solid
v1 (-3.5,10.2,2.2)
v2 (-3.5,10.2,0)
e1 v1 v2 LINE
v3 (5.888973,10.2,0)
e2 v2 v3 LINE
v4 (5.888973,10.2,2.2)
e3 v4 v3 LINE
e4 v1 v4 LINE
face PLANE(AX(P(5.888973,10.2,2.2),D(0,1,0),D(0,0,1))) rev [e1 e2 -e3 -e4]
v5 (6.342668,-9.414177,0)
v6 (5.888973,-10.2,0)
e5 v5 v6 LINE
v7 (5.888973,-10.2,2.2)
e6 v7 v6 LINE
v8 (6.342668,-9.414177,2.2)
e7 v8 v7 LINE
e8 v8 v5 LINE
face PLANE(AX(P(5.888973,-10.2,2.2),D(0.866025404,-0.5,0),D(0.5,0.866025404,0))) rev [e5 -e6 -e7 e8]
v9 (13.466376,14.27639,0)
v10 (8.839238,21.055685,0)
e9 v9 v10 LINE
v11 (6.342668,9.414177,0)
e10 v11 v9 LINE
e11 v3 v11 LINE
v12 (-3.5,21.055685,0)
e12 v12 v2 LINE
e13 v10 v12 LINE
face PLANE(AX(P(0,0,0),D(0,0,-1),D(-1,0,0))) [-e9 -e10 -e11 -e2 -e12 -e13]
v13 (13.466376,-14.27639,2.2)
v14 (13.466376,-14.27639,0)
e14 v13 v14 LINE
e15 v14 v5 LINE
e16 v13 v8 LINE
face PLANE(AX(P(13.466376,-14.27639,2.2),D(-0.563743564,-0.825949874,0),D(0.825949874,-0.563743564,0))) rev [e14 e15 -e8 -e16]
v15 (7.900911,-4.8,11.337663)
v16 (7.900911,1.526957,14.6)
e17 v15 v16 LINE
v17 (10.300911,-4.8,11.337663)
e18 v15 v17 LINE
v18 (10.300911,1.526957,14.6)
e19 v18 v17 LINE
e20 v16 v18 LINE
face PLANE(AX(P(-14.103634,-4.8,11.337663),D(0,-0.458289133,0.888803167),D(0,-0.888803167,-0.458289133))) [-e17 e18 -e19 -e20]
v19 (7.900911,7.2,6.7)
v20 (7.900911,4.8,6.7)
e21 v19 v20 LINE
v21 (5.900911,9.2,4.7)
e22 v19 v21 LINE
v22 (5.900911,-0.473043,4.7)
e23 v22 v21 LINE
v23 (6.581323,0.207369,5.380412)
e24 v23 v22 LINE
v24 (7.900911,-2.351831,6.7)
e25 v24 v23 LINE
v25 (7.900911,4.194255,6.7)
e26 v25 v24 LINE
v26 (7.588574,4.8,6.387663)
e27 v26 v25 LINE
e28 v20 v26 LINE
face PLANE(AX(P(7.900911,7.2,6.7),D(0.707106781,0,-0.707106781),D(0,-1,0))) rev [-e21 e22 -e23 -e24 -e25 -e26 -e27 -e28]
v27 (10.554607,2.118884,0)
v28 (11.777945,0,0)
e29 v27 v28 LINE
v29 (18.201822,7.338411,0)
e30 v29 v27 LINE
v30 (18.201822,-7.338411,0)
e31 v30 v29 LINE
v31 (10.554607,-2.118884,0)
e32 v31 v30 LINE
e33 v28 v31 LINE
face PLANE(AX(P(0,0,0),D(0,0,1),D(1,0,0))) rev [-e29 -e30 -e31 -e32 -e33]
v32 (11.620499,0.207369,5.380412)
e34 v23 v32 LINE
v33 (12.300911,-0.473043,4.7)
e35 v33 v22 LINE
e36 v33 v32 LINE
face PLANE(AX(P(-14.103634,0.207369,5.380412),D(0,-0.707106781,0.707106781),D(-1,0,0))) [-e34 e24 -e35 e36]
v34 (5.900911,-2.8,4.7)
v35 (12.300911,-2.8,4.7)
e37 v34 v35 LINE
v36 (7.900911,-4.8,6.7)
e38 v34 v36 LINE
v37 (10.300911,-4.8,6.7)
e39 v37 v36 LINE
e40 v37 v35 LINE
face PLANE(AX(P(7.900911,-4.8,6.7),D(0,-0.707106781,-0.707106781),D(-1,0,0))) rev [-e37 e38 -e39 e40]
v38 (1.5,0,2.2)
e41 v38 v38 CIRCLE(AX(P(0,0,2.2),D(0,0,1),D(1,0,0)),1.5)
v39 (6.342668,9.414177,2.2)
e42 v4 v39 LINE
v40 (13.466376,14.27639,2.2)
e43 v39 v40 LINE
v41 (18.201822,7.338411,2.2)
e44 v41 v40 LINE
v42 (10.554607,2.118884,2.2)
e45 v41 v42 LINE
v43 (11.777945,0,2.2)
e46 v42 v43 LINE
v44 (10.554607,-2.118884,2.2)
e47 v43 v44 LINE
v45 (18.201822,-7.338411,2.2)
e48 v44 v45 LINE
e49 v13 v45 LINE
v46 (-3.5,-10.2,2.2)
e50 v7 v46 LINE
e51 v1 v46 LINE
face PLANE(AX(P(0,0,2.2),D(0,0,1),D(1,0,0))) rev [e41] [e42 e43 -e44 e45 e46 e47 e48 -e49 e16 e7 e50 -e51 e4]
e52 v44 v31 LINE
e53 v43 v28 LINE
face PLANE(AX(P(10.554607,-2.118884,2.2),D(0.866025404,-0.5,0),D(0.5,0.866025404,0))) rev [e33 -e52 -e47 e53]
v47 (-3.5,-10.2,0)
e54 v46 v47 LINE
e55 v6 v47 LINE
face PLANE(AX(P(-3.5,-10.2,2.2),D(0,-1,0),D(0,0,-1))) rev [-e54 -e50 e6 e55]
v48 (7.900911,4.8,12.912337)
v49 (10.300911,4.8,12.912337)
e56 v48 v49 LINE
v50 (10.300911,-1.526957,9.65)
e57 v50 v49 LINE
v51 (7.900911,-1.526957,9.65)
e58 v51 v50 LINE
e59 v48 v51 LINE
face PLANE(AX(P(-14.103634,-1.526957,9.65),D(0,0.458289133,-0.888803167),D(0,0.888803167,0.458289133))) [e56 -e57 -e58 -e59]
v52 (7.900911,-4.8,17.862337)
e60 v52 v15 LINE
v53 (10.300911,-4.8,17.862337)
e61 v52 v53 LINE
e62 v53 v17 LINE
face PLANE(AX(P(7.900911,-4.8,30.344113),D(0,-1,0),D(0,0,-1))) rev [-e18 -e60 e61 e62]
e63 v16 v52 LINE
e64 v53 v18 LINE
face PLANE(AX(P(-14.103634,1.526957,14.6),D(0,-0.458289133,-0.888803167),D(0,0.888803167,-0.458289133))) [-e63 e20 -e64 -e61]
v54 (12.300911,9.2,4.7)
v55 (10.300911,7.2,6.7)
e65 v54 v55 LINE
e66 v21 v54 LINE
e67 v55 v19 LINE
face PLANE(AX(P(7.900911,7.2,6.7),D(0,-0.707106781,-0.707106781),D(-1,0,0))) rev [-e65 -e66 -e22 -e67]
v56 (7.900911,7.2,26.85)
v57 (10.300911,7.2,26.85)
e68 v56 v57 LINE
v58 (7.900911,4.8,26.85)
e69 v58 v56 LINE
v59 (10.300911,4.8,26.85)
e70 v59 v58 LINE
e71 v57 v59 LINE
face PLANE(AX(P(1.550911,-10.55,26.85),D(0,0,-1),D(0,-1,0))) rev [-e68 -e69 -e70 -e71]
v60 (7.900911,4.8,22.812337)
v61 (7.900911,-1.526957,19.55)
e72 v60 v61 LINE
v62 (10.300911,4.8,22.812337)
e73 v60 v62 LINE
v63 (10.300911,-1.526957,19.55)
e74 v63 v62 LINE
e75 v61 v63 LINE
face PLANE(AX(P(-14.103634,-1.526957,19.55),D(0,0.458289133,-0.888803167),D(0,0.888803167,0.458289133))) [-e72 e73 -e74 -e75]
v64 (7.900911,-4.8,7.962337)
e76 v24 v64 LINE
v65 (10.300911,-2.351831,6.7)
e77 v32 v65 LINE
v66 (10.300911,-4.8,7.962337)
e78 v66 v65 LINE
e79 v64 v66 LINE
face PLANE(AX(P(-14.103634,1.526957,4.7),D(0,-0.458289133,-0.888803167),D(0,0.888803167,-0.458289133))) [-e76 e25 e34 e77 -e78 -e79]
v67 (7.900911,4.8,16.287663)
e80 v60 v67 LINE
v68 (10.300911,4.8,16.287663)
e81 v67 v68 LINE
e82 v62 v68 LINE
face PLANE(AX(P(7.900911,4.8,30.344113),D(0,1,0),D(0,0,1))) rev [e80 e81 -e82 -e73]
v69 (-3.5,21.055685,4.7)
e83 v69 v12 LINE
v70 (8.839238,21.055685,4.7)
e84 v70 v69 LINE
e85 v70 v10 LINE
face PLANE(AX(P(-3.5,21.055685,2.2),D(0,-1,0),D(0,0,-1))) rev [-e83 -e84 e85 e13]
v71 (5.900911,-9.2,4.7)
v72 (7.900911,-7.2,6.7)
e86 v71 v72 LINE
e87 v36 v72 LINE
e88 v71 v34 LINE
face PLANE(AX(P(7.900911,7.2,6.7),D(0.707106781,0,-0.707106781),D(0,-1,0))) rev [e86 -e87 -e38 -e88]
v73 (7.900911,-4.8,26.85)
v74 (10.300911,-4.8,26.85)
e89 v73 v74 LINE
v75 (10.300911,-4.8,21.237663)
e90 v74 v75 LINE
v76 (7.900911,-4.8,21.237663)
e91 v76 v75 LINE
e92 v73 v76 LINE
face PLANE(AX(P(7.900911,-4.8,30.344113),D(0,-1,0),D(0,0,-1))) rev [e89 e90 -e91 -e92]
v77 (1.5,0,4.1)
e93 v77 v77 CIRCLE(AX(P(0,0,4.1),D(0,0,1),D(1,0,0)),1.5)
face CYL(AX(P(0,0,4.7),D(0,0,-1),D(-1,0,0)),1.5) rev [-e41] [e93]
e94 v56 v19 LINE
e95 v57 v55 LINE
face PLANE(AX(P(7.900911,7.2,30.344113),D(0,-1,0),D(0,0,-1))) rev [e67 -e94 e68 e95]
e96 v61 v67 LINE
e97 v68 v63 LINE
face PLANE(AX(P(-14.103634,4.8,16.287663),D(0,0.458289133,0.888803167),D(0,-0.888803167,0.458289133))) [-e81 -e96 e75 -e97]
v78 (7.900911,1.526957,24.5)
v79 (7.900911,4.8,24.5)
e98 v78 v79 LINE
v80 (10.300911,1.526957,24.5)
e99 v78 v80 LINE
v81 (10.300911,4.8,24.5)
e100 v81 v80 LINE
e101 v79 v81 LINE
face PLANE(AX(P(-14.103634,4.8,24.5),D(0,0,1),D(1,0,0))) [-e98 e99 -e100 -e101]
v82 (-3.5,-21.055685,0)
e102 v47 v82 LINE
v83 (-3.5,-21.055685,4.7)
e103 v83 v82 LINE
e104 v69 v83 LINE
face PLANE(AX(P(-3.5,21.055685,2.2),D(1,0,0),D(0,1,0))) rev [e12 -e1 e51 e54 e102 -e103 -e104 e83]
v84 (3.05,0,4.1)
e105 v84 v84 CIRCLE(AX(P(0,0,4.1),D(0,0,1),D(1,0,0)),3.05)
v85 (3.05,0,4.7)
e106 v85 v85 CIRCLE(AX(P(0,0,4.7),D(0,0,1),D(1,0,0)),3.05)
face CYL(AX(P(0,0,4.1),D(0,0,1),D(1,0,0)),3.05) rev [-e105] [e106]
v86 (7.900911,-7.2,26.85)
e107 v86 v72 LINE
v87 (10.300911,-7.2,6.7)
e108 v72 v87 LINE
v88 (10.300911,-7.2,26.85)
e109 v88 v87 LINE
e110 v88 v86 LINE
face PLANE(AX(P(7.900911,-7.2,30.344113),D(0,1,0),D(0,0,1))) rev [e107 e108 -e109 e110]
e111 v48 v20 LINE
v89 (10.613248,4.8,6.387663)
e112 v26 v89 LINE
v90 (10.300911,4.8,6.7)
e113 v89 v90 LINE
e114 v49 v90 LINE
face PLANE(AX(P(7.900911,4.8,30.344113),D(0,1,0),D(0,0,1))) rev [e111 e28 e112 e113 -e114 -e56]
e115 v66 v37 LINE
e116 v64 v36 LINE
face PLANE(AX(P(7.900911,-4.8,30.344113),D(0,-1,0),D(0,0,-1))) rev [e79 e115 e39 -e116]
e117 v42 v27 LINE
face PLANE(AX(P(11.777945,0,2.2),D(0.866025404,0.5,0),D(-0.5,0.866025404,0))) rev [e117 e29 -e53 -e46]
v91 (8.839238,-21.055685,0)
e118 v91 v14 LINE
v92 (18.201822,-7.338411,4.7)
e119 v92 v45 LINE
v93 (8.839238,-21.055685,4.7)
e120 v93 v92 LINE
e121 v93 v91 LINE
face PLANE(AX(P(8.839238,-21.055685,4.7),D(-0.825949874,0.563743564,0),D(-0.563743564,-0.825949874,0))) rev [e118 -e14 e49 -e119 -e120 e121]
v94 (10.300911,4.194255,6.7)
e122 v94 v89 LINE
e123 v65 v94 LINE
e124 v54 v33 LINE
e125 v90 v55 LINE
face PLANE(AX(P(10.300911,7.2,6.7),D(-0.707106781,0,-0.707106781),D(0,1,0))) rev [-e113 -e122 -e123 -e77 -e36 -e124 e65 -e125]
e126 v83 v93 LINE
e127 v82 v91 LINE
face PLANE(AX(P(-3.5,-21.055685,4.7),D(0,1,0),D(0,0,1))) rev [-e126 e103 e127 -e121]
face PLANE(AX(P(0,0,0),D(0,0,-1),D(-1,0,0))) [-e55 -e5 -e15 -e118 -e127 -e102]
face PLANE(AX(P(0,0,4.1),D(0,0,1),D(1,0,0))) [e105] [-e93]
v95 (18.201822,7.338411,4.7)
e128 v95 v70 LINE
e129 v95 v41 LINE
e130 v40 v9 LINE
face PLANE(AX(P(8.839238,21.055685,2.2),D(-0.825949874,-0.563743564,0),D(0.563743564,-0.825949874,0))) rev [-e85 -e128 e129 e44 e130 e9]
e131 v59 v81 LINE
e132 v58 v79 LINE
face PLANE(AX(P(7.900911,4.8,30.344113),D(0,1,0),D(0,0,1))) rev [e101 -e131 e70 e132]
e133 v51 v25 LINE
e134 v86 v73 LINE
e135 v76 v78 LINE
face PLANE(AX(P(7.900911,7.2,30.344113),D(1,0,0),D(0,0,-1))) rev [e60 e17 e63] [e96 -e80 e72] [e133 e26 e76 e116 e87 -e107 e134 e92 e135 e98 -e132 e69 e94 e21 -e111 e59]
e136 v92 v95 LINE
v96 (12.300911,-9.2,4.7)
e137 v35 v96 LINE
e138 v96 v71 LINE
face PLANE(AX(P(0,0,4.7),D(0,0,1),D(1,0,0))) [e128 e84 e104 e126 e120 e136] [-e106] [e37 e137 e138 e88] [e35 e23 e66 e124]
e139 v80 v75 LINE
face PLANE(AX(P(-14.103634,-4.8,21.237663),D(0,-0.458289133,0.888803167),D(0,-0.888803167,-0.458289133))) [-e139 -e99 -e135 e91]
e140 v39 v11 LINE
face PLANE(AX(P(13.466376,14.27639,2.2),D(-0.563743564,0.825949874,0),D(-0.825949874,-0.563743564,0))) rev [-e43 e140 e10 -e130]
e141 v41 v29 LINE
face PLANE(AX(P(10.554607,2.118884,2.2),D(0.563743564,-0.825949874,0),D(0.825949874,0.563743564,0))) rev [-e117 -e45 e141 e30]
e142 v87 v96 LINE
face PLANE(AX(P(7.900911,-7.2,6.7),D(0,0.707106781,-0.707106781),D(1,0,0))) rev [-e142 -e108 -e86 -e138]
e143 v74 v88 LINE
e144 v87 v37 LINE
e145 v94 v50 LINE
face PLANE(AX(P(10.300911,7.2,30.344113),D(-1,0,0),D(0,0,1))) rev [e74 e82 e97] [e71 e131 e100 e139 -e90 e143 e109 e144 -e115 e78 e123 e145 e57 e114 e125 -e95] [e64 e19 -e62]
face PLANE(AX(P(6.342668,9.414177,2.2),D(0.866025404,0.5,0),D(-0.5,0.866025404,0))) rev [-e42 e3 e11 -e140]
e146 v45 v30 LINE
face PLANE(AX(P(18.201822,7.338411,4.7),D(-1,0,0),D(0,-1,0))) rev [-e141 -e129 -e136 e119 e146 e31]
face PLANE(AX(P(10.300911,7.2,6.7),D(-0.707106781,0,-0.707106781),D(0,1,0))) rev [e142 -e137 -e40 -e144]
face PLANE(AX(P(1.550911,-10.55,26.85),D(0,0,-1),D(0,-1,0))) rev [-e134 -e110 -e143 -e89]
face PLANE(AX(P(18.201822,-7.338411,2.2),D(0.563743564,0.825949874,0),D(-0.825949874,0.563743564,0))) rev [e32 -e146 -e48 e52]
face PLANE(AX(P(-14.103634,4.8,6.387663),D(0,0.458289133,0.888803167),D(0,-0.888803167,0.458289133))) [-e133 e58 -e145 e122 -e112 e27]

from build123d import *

# Parameters (mm, degrees)
BOSS_EXTRUDE1_DEPTH   = 2.2
BOSS_EXTRUDE1_2_DEPTH = 2.2
BOSS_EXTRUDE1_3_DEPTH = 2.2
SKETCH3_R             = 1.5
BOSS_EXTRUDE2_DEPTH   = 2.5
SKETCH4_R             = 3.05
CUT_EXTRUDE1_DEPTH    = 0.6
SKETCH5_W             = 2.4
SKETCH5_H             = 2.4
BOSS_EXTRUDE3_DEPTH   = 22.15
BOSS_EXTRUDE4_DEPTH   = 2.4
CHAMFER1_SIZE         = 2
CHAMFER1_SIZE_2       = 1.48467926


with BuildPart() as part:
    # Sketch1 → Boss-Extrude1 (new body)
    with BuildSketch(Plane.XY):
        Polygon((-3.5, 21.055685406), (-3.5, 10.2), (5.888972746, 10.2), (6.342667922, 9.414176903), (13.466375906, 14.276390289), (8.839237969, 21.055685406), align=None)
    extrude(amount=BOSS_EXTRUDE1_DEPTH)



with BuildPart() as body_2:
    # Sketch1 → Boss-Extrude1 2 (new body)
    with BuildSketch(Plane.XY):
        Polygon((18.201821848, -7.338411352), (10.554607275, -2.118883945), (11.777945491, 0), (10.554607275, 2.118883945), (18.201821848, 7.338411352), align=None)
    extrude(amount=BOSS_EXTRUDE1_2_DEPTH)


with BuildPart() as body_3:
    # Sketch1 → Boss-Extrude1 3 (new body)
    with BuildSketch(Plane.XY):
        Polygon((8.839237969, -21.055685406), (13.466375906, -14.276390289), (6.342667922, -9.414176903), (5.888972746, -10.2), (-3.5, -10.2), (-3.5, -21.055685406), align=None)
    extrude(amount=BOSS_EXTRUDE1_3_DEPTH)


with BuildPart() as part_1:
    add(part.part)

    add(body_2.part)  # Boss-Extrude2 merges body 2

    add(body_3.part)  # Boss-Extrude2 merges body 3
    # Sketch3 → Boss-Extrude2 (add)
    with BuildSketch(Plane.XY.offset(2.2)):
        Polygon((-3.5, 21.055685406), (-3.5, -21.055685406), (8.839237969, -21.055685406), (18.201821848, -7.338411352), (18.201821848, 7.338411352), (8.839237969, 21.055685406), align=None)
        Circle(SKETCH3_R, mode=Mode.SUBTRACT)
    extrude(amount=BOSS_EXTRUDE2_DEPTH)

    # Sketch4 → Cut-Extrude1 (cut)
    with BuildSketch(Plane.XY.offset(4.7)):
        Circle(SKETCH4_R)
    extrude(amount=-CUT_EXTRUDE1_DEPTH, mode=Mode.SUBTRACT)

    # Sketch5 → Boss-Extrude3 (add)
    with BuildSketch(Plane.XY.offset(4.7)):
        with Locations((9.100910924, 6)):
            Rectangle(SKETCH5_W, SKETCH5_H)
        with Locations((9.100910924, -6)):
            Rectangle(SKETCH5_W, SKETCH5_H)
    extrude(amount=BOSS_EXTRUDE3_DEPTH)

    # Sketch6 → Boss-Extrude4 (add)
    with BuildSketch(Plane(origin=(10.300910924, 0, 0), x_dir=(0, 0, -1), z_dir=(1, 0, 0))):
        Polygon((-6.387662753, 4.8), (-9.65, -1.526957086), (-12.912337247, 4.8), (-16.287662753, 4.8), (-19.55, -1.526957086), (-22.812337247, 4.8), (-24.5, 4.8), (-24.5, 1.526957086), (-21.237662753, -4.8), (-17.862337247, -4.8), (-14.6, 1.526957086), (-11.337662753, -4.8), (-7.962337247, -4.8), (-4.7, 1.526957086), (-4.7, 4.8), align=None)
    extrude(amount=-BOSS_EXTRUDE4_DEPTH)

    # Chamfer1
    # the kernel refuses this chamfer: 2, 1.48467926 mm, written as the material it adds along each edge
    with BuildSketch(Plane(origin=(15.4442769, 1.526957086, 4.7), x_dir=(0, -1, 0), z_dir=(-1, 0, 0))) as chamfer1_piece_1_section:
        Polygon((CHAMFER1_SIZE, 0), (CHAMFER1_SIZE_2 * 0.888803167403, CHAMFER1_SIZE_2 * 0.458289133192), (0, 0), align=None)
    chamfer1_piece_1 = extrude(amount=12.686731952, mode=Mode.PRIVATE)
    chamfer1_piece_1 = split(chamfer1_piece_1, bisect_by=Plane(origin=(10.672593912, 1.526957086, 9.471682988), z_dir=(0.7071067811865476, 0, -0.7071067811865476)), keep=Keep.TOP, mode=Mode.PRIVATE)
    chamfer1_piece_1 = split(chamfer1_piece_1, bisect_by=Plane(origin=(13.872593912, 1.526957086, 3.128317012), z_dir=(-0.7071067811865476, 0, -0.7071067811865476)), keep=Keep.TOP, mode=Mode.PRIVATE)
    add(chamfer1_piece_1)
    with BuildSketch(Plane(origin=(2.757544948, 7.2, 4.7), x_dir=(0, 1, 0), z_dir=(1, 0, 0))) as chamfer1_piece_2_section:
        Polygon((CHAMFER1_SIZE, 0), (0, CHAMFER1_SIZE), (0, 0), align=None)
    chamfer1_piece_2 = extrude(amount=12.686731952, mode=Mode.PRIVATE)
    chamfer1_piece_2 = split(chamfer1_piece_2, bisect_by=Plane(origin=(4.329227936, 7.2, 3.128317012), z_dir=(0.7071067811865476, 0, -0.7071067811865476)), keep=Keep.TOP, mode=Mode.PRIVATE)
    chamfer1_piece_2 = split(chamfer1_piece_2, bisect_by=Plane(origin=(7.529227936, 7.2, 9.471682988), z_dir=(-0.7071067811865476, 0, -0.7071067811865476)), keep=Keep.TOP, mode=Mode.PRIVATE)
    add(chamfer1_piece_2)
    with BuildSketch(Plane(origin=(10.300910924, 12.343365976, 4.7), x_dir=(1, 0, 0), z_dir=(0, -1, 0))) as chamfer1_piece_3_section:
        Polygon((CHAMFER1_SIZE, 0), (0, CHAMFER1_SIZE), (0, 0), align=None)
    chamfer1_piece_3 = extrude(amount=15.959774866, mode=Mode.PRIVATE)
    chamfer1_piece_3 = split(chamfer1_piece_3, bisect_by=Plane(origin=(10.300910924, 4.8, 4.7), z_dir=(0, 1, 0)), keep=Keep.TOP, mode=Mode.PRIVATE)
    chamfer1_piece_3 = split(chamfer1_piece_3, bisect_by=Plane(origin=(10.300910924, 10.771682988, 3.128317012), z_dir=(0, -0.7071067811865476, -0.7071067811865476)), keep=Keep.TOP, mode=Mode.PRIVATE)
    add(chamfer1_piece_3)
    with BuildSketch(Plane(origin=(10.300910924, 12.343365976, 4.7), x_dir=(1, 0, 0), z_dir=(0, -1, 0))) as chamfer1_piece_4_section:
        Polygon((CHAMFER1_SIZE, 0), (0, CHAMFER1_SIZE), (0, 0), align=None)
    chamfer1_piece_4 = extrude(amount=15.959774866, mode=Mode.PRIVATE)
    chamfer1_piece_4 = split(chamfer1_piece_4, bisect_by=Plane(origin=(10.300910924, 11.446474594, 2.96057429), z_dir=(0, -0.4582891331950048, -0.8888031674084939)), keep=Keep.TOP, mode=Mode.PRIVATE)
    chamfer1_piece_4 = split(chamfer1_piece_4, bisect_by=Plane(origin=(10.300910924, 5.935161531, 11.108204445), z_dir=(0, 0.7071067811865488, -0.7071067811865462)), keep=Keep.TOP, mode=Mode.PRIVATE)
    add(chamfer1_piece_4)
    with BuildSketch(Plane(origin=(10.300910924, 12.343365976, 4.7), x_dir=(1, 0, 0), z_dir=(0, -1, 0))) as chamfer1_piece_5_section:
        Polygon((CHAMFER1_SIZE, 0), (0, CHAMFER1_SIZE), (0, 0), align=None)
    chamfer1_piece_5 = extrude(amount=15.959774866, mode=Mode.PRIVATE)
    chamfer1_piece_5 = split(chamfer1_piece_5, bisect_by=Plane(origin=(10.300910924, 10.071607195, 0.294164788), z_dir=(0, 0.4582891331950048, 0.8888031674084939)), keep=Keep.TOP, mode=Mode.PRIVATE)
    chamfer1_piece_5 = split(chamfer1_piece_5, bisect_by=Plane(origin=(10.300910924, 5.935161531, 11.108204445), z_dir=(0, -0.7071067811865488, 0.7071067811865462)), keep=Keep.TOP, mode=Mode.PRIVATE)
    add(chamfer1_piece_5)
    with BuildSketch(Plane(origin=(7.900910924, -3.61640889, 4.7), x_dir=(-1, 0, 0), z_dir=(0, 1, 0))) as chamfer1_piece_6_section:
        Polygon((CHAMFER1_SIZE, 0), (0, CHAMFER1_SIZE), (0, 0), align=None)
    chamfer1_piece_6 = extrude(amount=15.959774866, mode=Mode.PRIVATE)
    chamfer1_piece_6 = split(chamfer1_piece_6, bisect_by=Plane(origin=(7.900910924, -2.53615324, 6.795041262), z_dir=(0, 0.4582891331950048, 0.8888031674084939)), keep=Keep.TOP, mode=Mode.PRIVATE)
    chamfer1_piece_6 = split(chamfer1_piece_6, bisect_by=Plane(origin=(7.900910924, -1.16128584, 9.461450764), z_dir=(0, -0.4582891331950048, -0.8888031674084939)), keep=Keep.TOP, mode=Mode.PRIVATE)
    add(chamfer1_piece_6)
    with BuildSketch(Plane(origin=(7.900910924, -3.61640889, 4.7), x_dir=(-1, 0, 0), z_dir=(0, 1, 0))) as chamfer1_piece_7_section:
        Polygon((CHAMFER1_SIZE, 0), (0, CHAMFER1_SIZE), (0, 0), align=None)
    chamfer1_piece_7 = extrude(amount=15.959774866, mode=Mode.PRIVATE)
    chamfer1_piece_7 = split(chamfer1_piece_7, bisect_by=Plane(origin=(7.900910924, -1.16128584, 9.461450764), z_dir=(0, -0.4582891331950048, -0.8888031674084939)), keep=Keep.TOP, mode=Mode.PRIVATE)
    chamfer1_piece_7 = split(chamfer1_piece_7, bisect_by=Plane(origin=(7.900910924, -2.044725902, 3.128317012), z_dir=(0, 0.7071067811865488, -0.7071067811865462)), keep=Keep.TOP, mode=Mode.PRIVATE)
    add(chamfer1_piece_7)
    with BuildSketch(Plane(origin=(7.900910924, -3.61640889, 4.7), x_dir=(-1, 0, 0), z_dir=(0, 1, 0))) as chamfer1_piece_8_section:
        Polygon((CHAMFER1_SIZE, 0), (0, CHAMFER1_SIZE), (0, 0), align=None)
    chamfer1_piece_8 = extrude(amount=15.959774866, mode=Mode.PRIVATE)
    chamfer1_piece_8 = split(chamfer1_piece_8, bisect_by=Plane(origin=(7.900910924, 4.8, 4.7), z_dir=(0, 1, 0)), keep=Keep.TOP, mode=Mode.PRIVATE)
    chamfer1_piece_8 = split(chamfer1_piece_8, bisect_by=Plane(origin=(7.900910924, 2.791795555, 11.108204445), z_dir=(0, -0.7071067811865476, -0.7071067811865476)), keep=Keep.TOP, mode=Mode.PRIVATE)
    add(chamfer1_piece_8)
    with BuildSketch(Plane(origin=(2.757544948, -4.8, 4.7), x_dir=(0, 1, 0), z_dir=(1, 0, 0))) as chamfer1_piece_9_section:
        Polygon((CHAMFER1_SIZE, 0), (0, CHAMFER1_SIZE), (0, 0), align=None)
    chamfer1_piece_9 = extrude(amount=12.686731952, mode=Mode.PRIVATE)
    chamfer1_piece_9 = split(chamfer1_piece_9, bisect_by=Plane(origin=(4.329227936, -4.8, 3.128317012), z_dir=(0.7071067811865476, 0, -0.7071067811865476)), keep=Keep.TOP, mode=Mode.PRIVATE)
    chamfer1_piece_9 = split(chamfer1_piece_9, bisect_by=Plane(origin=(7.529227936, -4.8, 9.471682988), z_dir=(-0.7071067811865476, 0, -0.7071067811865476)), keep=Keep.TOP, mode=Mode.PRIVATE)
    add(chamfer1_piece_9)
    with BuildSketch(Plane(origin=(10.300910924, 0.343365976, 4.7), x_dir=(1, 0, 0), z_dir=(0, -1, 0))) as chamfer1_piece_10_section:
        Polygon((CHAMFER1_SIZE, 0), (0, CHAMFER1_SIZE), (0, 0), align=None)
    chamfer1_piece_10 = extrude(amount=12.686731952, mode=Mode.PRIVATE)
    chamfer1_piece_10 = split(chamfer1_piece_10, bisect_by=Plane(origin=(10.300910924, 0.59195435, 5.182110786), z_dir=(0, 0.4582891331950048, 0.8888031674084939)), keep=Keep.TOP, mode=Mode.PRIVATE)
    add(chamfer1_piece_10)
    with BuildSketch(Plane(origin=(10.300910924, 0.343365976, 4.7), x_dir=(1, 0, 0), z_dir=(0, -1, 0))) as chamfer1_piece_11_section:
        Polygon((CHAMFER1_SIZE, 0), (0, CHAMFER1_SIZE), (0, 0), align=None)
    chamfer1_piece_11 = extrude(amount=12.686731952, mode=Mode.PRIVATE)
    chamfer1_piece_11 = split(chamfer1_piece_11, bisect_by=Plane(origin=(10.300910924, -4.428317012, 9.471682988), z_dir=(0, 0.7071067811865477, -0.7071067811865474)), keep=Keep.TOP, mode=Mode.PRIVATE)
    chamfer1_piece_11 = split(chamfer1_piece_11, bisect_by=Plane(origin=(10.300910924, -1.228317012, 3.128317012), z_dir=(0, -0.7071067811865476, -0.7071067811865476)), keep=Keep.TOP, mode=Mode.PRIVATE)
    add(chamfer1_piece_11)
    with BuildSketch(Plane(origin=(15.4442769, -7.2, 4.7), x_dir=(0, -1, 0), z_dir=(-1, 0, 0))) as chamfer1_piece_12_section:
        Polygon((CHAMFER1_SIZE, 0), (0, CHAMFER1_SIZE), (0, 0), align=None)
    chamfer1_piece_12 = extrude(amount=12.686731952, mode=Mode.PRIVATE)
    chamfer1_piece_12 = split(chamfer1_piece_12, bisect_by=Plane(origin=(10.672593912, -7.2, 9.471682988), z_dir=(0.7071067811865476, 0, -0.7071067811865476)), keep=Keep.TOP, mode=Mode.PRIVATE)
    chamfer1_piece_12 = split(chamfer1_piece_12, bisect_by=Plane(origin=(13.872593912, -7.2, 3.128317012), z_dir=(-0.7071067811865476, 0, -0.7071067811865476)), keep=Keep.TOP, mode=Mode.PRIVATE)
    add(chamfer1_piece_12)
    with BuildSketch(Plane(origin=(7.900910924, -12.343365976, 4.7), x_dir=(-1, 0, 0), z_dir=(0, 1, 0))) as chamfer1_piece_13_section:
        Polygon((CHAMFER1_SIZE, 0), (0, CHAMFER1_SIZE), (0, 0), align=None)
    chamfer1_piece_13 = extrude(amount=12.686731952, mode=Mode.PRIVATE)
    chamfer1_piece_13 = split(chamfer1_piece_13, bisect_by=Plane(origin=(7.900910924, -10.771682988, 3.128317012), z_dir=(0, 0.7071067811865477, -0.7071067811865474)), keep=Keep.TOP, mode=Mode.PRIVATE)
    chamfer1_piece_13 = split(chamfer1_piece_13, bisect_by=Plane(origin=(7.900910924, -7.571682988, 9.471682988), z_dir=(0, -0.7071067811865476, -0.7071067811865476)), keep=Keep.TOP, mode=Mode.PRIVATE)
    add(chamfer1_piece_13)
    with BuildSketch(Plane(origin=(7.900910924, -12.343365976, 4.7), x_dir=(-1, 0, 0), z_dir=(0, 1, 0))) as chamfer1_piece_14_section:
        Polygon((CHAMFER1_SIZE, 0), (0, CHAMFER1_SIZE), (0, 0), align=None)
    chamfer1_piece_14 = extrude(amount=12.686731952, mode=Mode.PRIVATE)
    chamfer1_piece_14 = split(chamfer1_piece_14, bisect_by=Plane(origin=(7.900910924, -9.43019687, 10.349782509), z_dir=(0, 0.4582891331950048, 0.8888031674084939)), keep=Keep.TOP, mode=Mode.PRIVATE)
    add(chamfer1_piece_14)


solid = part_1.part
